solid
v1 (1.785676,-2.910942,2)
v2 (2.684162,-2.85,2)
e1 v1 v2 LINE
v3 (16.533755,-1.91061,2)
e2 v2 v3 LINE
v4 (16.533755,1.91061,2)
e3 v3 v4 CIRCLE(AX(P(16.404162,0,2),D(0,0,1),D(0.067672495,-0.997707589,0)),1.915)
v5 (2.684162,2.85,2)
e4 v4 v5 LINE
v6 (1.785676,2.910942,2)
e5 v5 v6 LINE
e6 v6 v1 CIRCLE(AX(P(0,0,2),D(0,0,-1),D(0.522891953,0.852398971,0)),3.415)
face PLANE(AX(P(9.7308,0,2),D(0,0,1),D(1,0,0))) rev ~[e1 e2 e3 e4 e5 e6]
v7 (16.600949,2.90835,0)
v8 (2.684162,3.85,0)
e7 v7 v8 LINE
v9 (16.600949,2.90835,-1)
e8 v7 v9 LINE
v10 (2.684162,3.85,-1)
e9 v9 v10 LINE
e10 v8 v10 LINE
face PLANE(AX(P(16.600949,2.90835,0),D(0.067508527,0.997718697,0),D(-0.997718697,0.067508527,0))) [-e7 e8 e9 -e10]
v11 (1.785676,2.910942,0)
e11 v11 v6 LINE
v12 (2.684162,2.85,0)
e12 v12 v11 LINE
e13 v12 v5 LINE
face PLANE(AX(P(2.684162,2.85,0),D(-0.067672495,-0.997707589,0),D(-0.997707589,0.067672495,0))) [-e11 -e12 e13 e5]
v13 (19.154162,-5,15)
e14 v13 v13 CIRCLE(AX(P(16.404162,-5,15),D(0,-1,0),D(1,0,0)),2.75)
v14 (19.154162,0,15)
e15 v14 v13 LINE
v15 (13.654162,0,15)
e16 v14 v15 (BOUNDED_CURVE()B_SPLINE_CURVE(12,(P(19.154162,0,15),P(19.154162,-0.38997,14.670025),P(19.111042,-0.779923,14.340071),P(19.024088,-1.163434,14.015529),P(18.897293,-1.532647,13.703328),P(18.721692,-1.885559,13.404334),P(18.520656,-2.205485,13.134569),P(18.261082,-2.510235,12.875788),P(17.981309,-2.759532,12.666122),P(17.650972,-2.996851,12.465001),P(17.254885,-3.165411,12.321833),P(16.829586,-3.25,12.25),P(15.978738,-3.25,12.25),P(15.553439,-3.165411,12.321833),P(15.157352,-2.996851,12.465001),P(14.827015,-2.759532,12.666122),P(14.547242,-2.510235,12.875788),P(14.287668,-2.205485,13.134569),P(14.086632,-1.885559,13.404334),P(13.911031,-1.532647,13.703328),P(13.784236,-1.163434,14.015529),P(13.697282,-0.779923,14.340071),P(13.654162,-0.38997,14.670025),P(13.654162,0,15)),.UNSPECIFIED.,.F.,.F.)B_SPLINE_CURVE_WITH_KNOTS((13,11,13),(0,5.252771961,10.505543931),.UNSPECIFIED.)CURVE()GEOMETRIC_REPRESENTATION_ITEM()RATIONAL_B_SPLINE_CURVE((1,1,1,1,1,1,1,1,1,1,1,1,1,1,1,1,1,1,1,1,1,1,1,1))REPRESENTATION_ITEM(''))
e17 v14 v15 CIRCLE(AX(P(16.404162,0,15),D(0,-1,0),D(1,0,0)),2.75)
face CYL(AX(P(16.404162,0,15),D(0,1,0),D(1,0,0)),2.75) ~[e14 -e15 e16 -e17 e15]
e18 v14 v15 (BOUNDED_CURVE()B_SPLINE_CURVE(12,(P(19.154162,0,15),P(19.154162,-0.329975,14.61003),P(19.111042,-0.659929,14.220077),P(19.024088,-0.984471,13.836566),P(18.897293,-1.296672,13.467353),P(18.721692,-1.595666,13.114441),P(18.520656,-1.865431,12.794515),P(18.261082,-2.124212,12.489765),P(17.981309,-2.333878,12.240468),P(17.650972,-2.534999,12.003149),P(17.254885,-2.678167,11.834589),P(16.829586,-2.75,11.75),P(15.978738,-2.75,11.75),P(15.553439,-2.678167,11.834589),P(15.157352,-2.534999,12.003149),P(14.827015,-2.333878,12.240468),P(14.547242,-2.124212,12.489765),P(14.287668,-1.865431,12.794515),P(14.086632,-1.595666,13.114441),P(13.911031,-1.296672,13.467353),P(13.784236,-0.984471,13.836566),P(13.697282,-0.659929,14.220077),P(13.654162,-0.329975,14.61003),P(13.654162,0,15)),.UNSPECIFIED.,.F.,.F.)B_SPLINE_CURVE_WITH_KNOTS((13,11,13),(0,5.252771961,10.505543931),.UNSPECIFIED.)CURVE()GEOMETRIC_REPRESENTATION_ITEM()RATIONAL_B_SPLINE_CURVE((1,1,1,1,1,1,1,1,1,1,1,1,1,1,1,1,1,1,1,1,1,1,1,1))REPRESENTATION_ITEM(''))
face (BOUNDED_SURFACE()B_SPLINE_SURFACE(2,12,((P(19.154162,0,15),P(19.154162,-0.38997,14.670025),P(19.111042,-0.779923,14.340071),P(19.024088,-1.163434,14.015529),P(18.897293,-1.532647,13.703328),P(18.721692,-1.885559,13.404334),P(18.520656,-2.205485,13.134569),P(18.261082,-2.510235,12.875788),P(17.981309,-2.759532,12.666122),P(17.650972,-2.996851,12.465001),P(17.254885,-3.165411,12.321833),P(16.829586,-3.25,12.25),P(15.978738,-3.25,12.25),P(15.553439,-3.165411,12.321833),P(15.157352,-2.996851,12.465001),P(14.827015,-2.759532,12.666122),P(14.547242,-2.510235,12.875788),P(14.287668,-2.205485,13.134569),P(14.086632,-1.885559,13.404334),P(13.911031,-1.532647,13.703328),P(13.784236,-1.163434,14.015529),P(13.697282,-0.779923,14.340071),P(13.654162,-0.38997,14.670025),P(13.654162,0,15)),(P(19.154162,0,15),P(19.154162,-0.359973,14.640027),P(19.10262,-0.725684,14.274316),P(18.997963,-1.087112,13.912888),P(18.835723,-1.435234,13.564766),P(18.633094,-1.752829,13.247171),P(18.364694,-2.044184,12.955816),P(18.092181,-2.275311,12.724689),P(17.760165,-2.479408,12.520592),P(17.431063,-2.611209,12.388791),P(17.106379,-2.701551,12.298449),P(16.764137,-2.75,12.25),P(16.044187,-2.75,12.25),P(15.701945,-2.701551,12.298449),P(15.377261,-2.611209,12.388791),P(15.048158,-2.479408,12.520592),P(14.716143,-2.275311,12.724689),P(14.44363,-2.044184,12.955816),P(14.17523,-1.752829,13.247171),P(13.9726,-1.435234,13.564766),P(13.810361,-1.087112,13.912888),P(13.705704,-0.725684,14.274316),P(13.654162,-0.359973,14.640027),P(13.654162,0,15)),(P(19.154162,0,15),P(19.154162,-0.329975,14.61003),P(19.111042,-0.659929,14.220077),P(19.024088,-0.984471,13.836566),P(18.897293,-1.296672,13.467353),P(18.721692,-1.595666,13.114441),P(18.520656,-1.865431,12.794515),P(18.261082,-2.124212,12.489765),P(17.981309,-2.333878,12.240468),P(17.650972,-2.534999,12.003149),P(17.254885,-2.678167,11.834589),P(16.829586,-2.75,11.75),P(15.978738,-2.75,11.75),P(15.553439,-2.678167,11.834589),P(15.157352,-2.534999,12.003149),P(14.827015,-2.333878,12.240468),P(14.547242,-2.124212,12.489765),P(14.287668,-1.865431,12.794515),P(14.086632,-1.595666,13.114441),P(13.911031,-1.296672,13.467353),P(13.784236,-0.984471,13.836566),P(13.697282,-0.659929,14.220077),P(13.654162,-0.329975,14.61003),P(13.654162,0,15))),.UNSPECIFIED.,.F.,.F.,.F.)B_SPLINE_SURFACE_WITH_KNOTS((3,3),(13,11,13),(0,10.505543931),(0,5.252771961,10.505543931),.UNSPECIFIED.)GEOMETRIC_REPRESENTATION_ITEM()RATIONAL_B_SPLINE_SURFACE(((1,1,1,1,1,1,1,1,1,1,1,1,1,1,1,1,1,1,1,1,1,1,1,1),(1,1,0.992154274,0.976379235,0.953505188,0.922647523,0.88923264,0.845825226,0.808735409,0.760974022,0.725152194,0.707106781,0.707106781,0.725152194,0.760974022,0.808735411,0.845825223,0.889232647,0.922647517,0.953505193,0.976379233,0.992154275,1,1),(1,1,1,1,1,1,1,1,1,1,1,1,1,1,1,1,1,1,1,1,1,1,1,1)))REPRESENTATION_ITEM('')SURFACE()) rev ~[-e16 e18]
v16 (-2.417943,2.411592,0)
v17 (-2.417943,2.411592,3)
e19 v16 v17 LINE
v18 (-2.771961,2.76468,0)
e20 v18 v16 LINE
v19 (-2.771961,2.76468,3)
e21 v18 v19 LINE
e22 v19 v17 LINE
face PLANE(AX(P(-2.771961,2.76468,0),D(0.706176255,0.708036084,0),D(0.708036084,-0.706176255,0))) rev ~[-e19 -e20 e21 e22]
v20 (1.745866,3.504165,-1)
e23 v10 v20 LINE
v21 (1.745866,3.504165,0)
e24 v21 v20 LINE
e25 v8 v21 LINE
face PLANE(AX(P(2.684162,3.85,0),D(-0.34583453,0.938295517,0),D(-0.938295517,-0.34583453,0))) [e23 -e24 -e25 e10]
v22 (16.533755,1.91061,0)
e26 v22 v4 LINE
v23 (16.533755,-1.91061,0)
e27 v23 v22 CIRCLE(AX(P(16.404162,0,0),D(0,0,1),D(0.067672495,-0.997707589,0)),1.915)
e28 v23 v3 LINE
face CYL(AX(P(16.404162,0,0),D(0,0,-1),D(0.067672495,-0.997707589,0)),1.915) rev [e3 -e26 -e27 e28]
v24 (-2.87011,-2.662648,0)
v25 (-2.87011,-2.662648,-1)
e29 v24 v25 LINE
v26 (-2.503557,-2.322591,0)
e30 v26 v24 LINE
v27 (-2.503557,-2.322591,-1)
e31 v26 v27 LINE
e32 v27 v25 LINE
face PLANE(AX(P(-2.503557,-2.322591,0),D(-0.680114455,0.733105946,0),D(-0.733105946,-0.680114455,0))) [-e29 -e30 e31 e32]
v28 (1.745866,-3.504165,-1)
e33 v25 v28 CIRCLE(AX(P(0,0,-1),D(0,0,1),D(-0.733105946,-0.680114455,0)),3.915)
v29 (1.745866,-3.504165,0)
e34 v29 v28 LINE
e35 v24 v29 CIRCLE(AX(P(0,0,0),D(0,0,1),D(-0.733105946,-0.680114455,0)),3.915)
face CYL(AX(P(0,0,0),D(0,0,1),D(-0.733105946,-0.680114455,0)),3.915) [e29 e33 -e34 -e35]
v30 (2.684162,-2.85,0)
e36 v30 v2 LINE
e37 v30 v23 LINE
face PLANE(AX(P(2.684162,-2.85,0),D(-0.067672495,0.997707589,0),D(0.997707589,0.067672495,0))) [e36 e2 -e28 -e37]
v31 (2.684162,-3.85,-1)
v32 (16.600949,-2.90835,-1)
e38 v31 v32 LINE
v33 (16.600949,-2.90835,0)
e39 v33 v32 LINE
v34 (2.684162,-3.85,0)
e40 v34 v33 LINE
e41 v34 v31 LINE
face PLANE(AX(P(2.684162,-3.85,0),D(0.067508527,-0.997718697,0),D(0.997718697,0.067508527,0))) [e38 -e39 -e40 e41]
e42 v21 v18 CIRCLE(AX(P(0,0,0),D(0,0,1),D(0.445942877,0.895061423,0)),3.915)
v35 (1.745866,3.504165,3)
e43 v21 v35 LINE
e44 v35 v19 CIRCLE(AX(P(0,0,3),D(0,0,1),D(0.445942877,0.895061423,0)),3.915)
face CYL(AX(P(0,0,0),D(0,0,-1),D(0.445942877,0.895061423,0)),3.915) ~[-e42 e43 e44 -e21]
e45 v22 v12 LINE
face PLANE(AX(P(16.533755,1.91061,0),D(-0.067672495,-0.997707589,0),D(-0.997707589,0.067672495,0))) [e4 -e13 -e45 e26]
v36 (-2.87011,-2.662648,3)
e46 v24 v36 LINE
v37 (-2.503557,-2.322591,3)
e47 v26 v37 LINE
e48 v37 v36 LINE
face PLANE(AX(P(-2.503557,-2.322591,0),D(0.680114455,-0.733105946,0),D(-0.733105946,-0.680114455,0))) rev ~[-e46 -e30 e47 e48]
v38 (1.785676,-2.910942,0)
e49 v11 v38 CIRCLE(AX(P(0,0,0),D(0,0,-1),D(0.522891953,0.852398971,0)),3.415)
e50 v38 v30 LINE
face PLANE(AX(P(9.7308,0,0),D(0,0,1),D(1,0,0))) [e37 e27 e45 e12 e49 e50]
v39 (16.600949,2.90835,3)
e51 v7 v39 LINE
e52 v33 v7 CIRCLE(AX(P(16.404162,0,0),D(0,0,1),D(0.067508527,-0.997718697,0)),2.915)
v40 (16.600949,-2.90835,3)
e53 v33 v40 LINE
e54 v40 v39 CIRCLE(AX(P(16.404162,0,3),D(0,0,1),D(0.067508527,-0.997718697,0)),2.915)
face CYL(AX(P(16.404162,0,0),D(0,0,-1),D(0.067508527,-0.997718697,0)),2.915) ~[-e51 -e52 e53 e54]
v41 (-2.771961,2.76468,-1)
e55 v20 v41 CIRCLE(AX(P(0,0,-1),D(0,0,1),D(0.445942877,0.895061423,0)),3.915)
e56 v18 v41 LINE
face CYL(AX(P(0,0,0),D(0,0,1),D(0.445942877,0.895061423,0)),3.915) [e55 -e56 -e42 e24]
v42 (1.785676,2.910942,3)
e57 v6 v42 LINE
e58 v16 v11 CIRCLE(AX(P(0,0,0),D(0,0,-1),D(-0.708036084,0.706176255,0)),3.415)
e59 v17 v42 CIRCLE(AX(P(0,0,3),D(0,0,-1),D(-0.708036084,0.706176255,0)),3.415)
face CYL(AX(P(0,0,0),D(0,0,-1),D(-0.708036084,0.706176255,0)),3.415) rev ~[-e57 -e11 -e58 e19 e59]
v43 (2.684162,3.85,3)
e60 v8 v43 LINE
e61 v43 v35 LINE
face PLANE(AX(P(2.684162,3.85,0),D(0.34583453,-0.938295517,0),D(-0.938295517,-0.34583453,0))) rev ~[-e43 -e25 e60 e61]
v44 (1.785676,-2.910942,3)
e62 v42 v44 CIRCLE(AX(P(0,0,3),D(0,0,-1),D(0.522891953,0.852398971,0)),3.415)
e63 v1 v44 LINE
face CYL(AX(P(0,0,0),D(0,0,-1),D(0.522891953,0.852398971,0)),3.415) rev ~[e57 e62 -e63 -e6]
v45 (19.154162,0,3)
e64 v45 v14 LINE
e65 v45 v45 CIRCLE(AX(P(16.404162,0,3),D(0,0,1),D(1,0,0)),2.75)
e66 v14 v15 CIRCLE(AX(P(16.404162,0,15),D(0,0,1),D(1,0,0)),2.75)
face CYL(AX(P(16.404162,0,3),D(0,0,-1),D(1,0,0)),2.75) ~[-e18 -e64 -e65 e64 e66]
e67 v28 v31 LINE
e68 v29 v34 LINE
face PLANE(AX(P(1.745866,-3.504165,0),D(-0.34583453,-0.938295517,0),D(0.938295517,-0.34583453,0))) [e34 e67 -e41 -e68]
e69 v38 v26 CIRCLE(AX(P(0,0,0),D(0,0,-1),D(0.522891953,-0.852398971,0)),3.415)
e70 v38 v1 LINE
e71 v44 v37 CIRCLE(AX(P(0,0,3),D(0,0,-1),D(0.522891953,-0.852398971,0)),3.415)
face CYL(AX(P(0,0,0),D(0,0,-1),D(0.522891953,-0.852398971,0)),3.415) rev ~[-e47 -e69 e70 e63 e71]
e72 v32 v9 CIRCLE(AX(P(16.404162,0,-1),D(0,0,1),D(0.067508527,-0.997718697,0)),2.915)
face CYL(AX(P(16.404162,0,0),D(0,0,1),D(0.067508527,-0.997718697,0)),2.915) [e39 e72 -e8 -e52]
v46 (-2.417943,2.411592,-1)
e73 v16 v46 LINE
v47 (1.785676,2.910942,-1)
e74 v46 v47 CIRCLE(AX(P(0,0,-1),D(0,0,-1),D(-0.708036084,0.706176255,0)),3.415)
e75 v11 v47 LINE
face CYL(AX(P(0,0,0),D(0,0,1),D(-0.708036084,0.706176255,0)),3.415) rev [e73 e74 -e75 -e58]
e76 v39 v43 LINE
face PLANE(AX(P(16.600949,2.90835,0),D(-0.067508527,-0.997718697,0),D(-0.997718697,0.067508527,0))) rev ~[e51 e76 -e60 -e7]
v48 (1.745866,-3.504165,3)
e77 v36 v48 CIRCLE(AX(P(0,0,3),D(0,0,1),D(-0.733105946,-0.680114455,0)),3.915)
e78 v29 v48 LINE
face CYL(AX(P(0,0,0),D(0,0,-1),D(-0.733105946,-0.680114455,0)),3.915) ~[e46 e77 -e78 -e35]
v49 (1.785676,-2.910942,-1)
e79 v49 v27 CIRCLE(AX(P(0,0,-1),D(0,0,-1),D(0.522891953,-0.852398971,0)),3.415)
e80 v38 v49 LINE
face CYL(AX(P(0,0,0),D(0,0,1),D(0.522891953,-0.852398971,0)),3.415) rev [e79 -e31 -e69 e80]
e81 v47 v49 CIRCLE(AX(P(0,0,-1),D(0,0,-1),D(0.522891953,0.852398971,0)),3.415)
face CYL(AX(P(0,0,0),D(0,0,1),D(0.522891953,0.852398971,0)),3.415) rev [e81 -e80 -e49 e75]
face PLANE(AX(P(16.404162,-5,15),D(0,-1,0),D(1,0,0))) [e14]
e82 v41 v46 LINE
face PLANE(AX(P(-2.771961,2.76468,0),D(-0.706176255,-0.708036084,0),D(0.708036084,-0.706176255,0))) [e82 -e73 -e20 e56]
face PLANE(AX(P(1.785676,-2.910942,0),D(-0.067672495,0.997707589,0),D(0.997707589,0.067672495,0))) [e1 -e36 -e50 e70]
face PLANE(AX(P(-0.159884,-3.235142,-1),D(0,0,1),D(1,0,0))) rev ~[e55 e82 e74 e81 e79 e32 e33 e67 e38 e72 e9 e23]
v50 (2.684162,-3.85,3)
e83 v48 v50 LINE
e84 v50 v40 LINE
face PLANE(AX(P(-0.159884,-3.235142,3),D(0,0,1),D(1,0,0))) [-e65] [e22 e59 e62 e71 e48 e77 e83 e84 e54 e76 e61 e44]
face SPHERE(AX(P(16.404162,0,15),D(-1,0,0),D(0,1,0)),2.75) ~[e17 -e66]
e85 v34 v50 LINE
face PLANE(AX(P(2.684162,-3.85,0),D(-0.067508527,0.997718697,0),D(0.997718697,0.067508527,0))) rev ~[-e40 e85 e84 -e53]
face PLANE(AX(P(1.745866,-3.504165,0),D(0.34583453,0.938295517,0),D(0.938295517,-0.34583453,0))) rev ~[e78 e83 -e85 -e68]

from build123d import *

# Parameters (mm, degrees)
F1_DEPTH = 1
F2_DEPTH = 3
F3_DEPTH = 2
F4_R     = 2.75
F5_DEPTH = 12
F7_ANGLE = 90
F8_R     = 2.75
F9_DEPTH = 5
F10_R    = 0.5


# Not quite as in the source:
# - a feature names something its author has since deleted; it is built from what else it names


with BuildPart() as f1:
    # F0 (on Top) → F1 (new body)
    with BuildSketch(Plane.XY):
        with BuildLine():
            ThreePointArc((1.7856760203, -2.9109424849), (-0.4640879363, -3.3833189899), (-2.5035568051, -2.3225908645))
            Line((-2.5035568051, -2.3225908645), (-2.870109778, -2.6626480921))
            ThreePointArc((-2.870109778, -2.6626480921), (-0.7021528954, -3.8515200001), (1.745866363, -3.5041654702))
            ThreePointArc((1.745866363, -3.5041654702), (2.2390334242, -3.2115345748), (2.6841618804, -2.85))
            Line((2.6841618804, -2.85), (1.7856760203, -2.9109424849))
        make_face()
        with BuildLine():
            ThreePointArc((1.7856760202, 2.910942485), (3.415, 0), (1.7856760203, -2.9109424849))
            Line((1.7856760203, -2.9109424849), (2.6841618804, -2.85))
            ThreePointArc((2.6841618804, -2.85), (3.915, 0), (2.6841618804, 2.85))
            Line((2.6841618803, 2.85), (1.7856760202, 2.910942485))
        make_face()
        with BuildLine():
            ThreePointArc((-2.4179432279, 2.4115919113), (-0.4028376898, 3.391157147), (1.7856760202, 2.910942485))
            Line((1.7856760202, 2.910942485), (2.6841618803, 2.85))
            ThreePointArc((2.6841618804, 2.85), (2.2390334242, 3.2115345748), (1.7458663629, 3.5041654702))
            ThreePointArc((1.7458663629, 3.5041654702), (-0.6323981068, 3.8635861107), (-2.7719612701, 2.7646800388))
            Line((-2.7719612701, 2.7646800388), (-2.4179432279, 2.4115919113))
        make_face()
        with BuildLine():
            Line((16.533754708, -1.9106100332), (2.6841618804, -2.85))
            ThreePointArc((2.6841618804, -2.85), (2.2390334242, -3.2115345748), (1.745866363, -3.5041654702))
            Line((1.745866363, -3.5041654702), (2.6841618804, -3.85))
            Line((2.6841618804, -3.85), (16.6009492353, -2.9083500025))
            ThreePointArc((16.6009492353, -2.9083500025), (19.3191618804, 0), (16.6009492353, 2.9083500025))
            Line((16.6009492353, 2.9083500025), (2.6841618803, 3.85))
            Line((2.6841618803, 3.85), (2.6841618803, 2.85))
            Line((2.6841618803, 2.85), (16.533754708, 1.9106100332))
            ThreePointArc((16.533754708, 1.9106100332), (18.3191618804, 0), (16.533754708, -1.9106100332))
        make_face()
        with BuildLine():
            ThreePointArc((2.6841618804, 2.85), (3.915, 0), (2.6841618804, -2.85))
            Line((2.6841618804, -2.85), (16.533754708, -1.9106100332))
            ThreePointArc((16.533754708, -1.9106100332), (18.3191618804, 0), (16.533754708, 1.9106100332))
            Line((16.533754708, 1.9106100332), (2.6841618803, 2.85))
        make_face()
        with BuildLine():
            ThreePointArc((1.7458663629, 3.5041654702), (2.2390334242, 3.2115345748), (2.6841618804, 2.85))
            Line((2.6841618803, 2.85), (2.6841618803, 3.85))
            Line((2.6841618803, 3.85), (1.7458663629, 3.5041654702))
        make_face()
    extrude(amount=-F1_DEPTH)

    # F0 (on Top) → F2 (join)
    with BuildSketch(Plane.XY):
        with BuildLine():
            ThreePointArc((1.7856760203, -2.9109424849), (-0.4640879363, -3.3833189899), (-2.5035568051, -2.3225908645))
            Line((-2.5035568051, -2.3225908645), (-2.870109778, -2.6626480921))
            ThreePointArc((-2.870109778, -2.6626480921), (-0.7021528954, -3.8515200001), (1.745866363, -3.5041654702))
            ThreePointArc((1.745866363, -3.5041654702), (2.2390334242, -3.2115345748), (2.6841618804, -2.85))
            Line((2.6841618804, -2.85), (1.7856760203, -2.9109424849))
        make_face()
        with BuildLine():
            ThreePointArc((1.7856760202, 2.910942485), (3.415, 0), (1.7856760203, -2.9109424849))
            Line((1.7856760203, -2.9109424849), (2.6841618804, -2.85))
            ThreePointArc((2.6841618804, -2.85), (3.915, 0), (2.6841618804, 2.85))
            Line((2.6841618803, 2.85), (1.7856760202, 2.910942485))
        make_face()
        with BuildLine():
            ThreePointArc((-2.4179432279, 2.4115919113), (-0.4028376898, 3.391157147), (1.7856760202, 2.910942485))
            Line((1.7856760202, 2.910942485), (2.6841618803, 2.85))
            ThreePointArc((2.6841618804, 2.85), (2.2390334242, 3.2115345748), (1.7458663629, 3.5041654702))
            ThreePointArc((1.7458663629, 3.5041654702), (-0.6323981068, 3.8635861107), (-2.7719612701, 2.7646800388))
            Line((-2.7719612701, 2.7646800388), (-2.4179432279, 2.4115919113))
        make_face()
        with BuildLine():
            ThreePointArc((1.7458663629, 3.5041654702), (2.2390334242, 3.2115345748), (2.6841618804, 2.85))
            Line((2.6841618803, 2.85), (2.6841618803, 3.85))
            Line((2.6841618803, 3.85), (1.7458663629, 3.5041654702))
        make_face()
        with BuildLine():
            Line((16.533754708, -1.9106100332), (2.6841618804, -2.85))
            ThreePointArc((2.6841618804, -2.85), (2.2390334242, -3.2115345748), (1.745866363, -3.5041654702))
            Line((1.745866363, -3.5041654702), (2.6841618804, -3.85))
            Line((2.6841618804, -3.85), (16.6009492353, -2.9083500025))
            ThreePointArc((16.6009492353, -2.9083500025), (19.3191618804, 0), (16.6009492353, 2.9083500025))
            Line((16.6009492353, 2.9083500025), (2.6841618803, 3.85))
            Line((2.6841618803, 3.85), (2.6841618803, 2.85))
            Line((2.6841618803, 2.85), (16.533754708, 1.9106100332))
            ThreePointArc((16.533754708, 1.9106100332), (18.3191618804, 0), (16.533754708, -1.9106100332))
        make_face()
        with BuildLine():
            ThreePointArc((2.6841618804, 2.85), (3.915, 0), (2.6841618804, -2.85))
            Line((2.6841618804, -2.85), (16.533754708, -1.9106100332))
            ThreePointArc((16.533754708, -1.9106100332), (18.3191618804, 0), (16.533754708, 1.9106100332))
            Line((16.533754708, 1.9106100332), (2.6841618803, 2.85))
        make_face()
    extrude(amount=F2_DEPTH)

    # F0 (on Top) → F3 (cut)
    with BuildSketch(Plane.XY):
        with BuildLine():
            ThreePointArc((2.6841618804, 2.85), (3.915, 0), (2.6841618804, -2.85))
            Line((2.6841618804, -2.85), (16.533754708, -1.9106100332))
            ThreePointArc((16.533754708, -1.9106100332), (18.3191618804, 0), (16.533754708, 1.9106100332))
            Line((16.533754708, 1.9106100332), (2.6841618803, 2.85))
        make_face()
        with BuildLine():
            ThreePointArc((1.7856760202, 2.910942485), (3.415, 0), (1.7856760203, -2.9109424849))
            Line((1.7856760203, -2.9109424849), (2.6841618804, -2.85))
            ThreePointArc((2.6841618804, -2.85), (3.915, 0), (2.6841618804, 2.85))
            Line((2.6841618803, 2.85), (1.7856760202, 2.910942485))
        make_face()
    extrude(amount=F3_DEPTH, mode=Mode.SUBTRACT)

    # F4 (on face) → F5 (join)
    with BuildSketch(Plane.XY.offset(3)):
        with Locations((16.4041618804, 0)):
            Circle(F4_R)
    extrude(amount=F5_DEPTH)

    # F6 (on face) → F7 (revolve)
    with BuildSketch(Plane.XY.offset(15)):
        with BuildLine():
            Line((13.6541618804, 0), (19.1541618804, 0))
            ThreePointArc((19.1541618804, 0), (16.4041618804, 2.75), (13.6541618804, 0))
        make_face()
    revolve(axis=Axis((16.4041618804, 0, 15), (1, 0, 0)), revolution_arc=F7_ANGLE)

    # F8 (on face) → F9 (join)
    with BuildSketch(Plane.XZ):
        with Locations((16.4041618804, 15)):
            Circle(F8_R)
    extrude(amount=F9_DEPTH)

    # F10
    f10_edges = [f1.edges().sort_by_distance(p)[0] for p in [
        (18.503226, -1.776634, 13.223366),
        (14.305098, -1.776634, 13.223366),
    ]]
    fillet(f10_edges, radius=F10_R)


solid = f1.part
